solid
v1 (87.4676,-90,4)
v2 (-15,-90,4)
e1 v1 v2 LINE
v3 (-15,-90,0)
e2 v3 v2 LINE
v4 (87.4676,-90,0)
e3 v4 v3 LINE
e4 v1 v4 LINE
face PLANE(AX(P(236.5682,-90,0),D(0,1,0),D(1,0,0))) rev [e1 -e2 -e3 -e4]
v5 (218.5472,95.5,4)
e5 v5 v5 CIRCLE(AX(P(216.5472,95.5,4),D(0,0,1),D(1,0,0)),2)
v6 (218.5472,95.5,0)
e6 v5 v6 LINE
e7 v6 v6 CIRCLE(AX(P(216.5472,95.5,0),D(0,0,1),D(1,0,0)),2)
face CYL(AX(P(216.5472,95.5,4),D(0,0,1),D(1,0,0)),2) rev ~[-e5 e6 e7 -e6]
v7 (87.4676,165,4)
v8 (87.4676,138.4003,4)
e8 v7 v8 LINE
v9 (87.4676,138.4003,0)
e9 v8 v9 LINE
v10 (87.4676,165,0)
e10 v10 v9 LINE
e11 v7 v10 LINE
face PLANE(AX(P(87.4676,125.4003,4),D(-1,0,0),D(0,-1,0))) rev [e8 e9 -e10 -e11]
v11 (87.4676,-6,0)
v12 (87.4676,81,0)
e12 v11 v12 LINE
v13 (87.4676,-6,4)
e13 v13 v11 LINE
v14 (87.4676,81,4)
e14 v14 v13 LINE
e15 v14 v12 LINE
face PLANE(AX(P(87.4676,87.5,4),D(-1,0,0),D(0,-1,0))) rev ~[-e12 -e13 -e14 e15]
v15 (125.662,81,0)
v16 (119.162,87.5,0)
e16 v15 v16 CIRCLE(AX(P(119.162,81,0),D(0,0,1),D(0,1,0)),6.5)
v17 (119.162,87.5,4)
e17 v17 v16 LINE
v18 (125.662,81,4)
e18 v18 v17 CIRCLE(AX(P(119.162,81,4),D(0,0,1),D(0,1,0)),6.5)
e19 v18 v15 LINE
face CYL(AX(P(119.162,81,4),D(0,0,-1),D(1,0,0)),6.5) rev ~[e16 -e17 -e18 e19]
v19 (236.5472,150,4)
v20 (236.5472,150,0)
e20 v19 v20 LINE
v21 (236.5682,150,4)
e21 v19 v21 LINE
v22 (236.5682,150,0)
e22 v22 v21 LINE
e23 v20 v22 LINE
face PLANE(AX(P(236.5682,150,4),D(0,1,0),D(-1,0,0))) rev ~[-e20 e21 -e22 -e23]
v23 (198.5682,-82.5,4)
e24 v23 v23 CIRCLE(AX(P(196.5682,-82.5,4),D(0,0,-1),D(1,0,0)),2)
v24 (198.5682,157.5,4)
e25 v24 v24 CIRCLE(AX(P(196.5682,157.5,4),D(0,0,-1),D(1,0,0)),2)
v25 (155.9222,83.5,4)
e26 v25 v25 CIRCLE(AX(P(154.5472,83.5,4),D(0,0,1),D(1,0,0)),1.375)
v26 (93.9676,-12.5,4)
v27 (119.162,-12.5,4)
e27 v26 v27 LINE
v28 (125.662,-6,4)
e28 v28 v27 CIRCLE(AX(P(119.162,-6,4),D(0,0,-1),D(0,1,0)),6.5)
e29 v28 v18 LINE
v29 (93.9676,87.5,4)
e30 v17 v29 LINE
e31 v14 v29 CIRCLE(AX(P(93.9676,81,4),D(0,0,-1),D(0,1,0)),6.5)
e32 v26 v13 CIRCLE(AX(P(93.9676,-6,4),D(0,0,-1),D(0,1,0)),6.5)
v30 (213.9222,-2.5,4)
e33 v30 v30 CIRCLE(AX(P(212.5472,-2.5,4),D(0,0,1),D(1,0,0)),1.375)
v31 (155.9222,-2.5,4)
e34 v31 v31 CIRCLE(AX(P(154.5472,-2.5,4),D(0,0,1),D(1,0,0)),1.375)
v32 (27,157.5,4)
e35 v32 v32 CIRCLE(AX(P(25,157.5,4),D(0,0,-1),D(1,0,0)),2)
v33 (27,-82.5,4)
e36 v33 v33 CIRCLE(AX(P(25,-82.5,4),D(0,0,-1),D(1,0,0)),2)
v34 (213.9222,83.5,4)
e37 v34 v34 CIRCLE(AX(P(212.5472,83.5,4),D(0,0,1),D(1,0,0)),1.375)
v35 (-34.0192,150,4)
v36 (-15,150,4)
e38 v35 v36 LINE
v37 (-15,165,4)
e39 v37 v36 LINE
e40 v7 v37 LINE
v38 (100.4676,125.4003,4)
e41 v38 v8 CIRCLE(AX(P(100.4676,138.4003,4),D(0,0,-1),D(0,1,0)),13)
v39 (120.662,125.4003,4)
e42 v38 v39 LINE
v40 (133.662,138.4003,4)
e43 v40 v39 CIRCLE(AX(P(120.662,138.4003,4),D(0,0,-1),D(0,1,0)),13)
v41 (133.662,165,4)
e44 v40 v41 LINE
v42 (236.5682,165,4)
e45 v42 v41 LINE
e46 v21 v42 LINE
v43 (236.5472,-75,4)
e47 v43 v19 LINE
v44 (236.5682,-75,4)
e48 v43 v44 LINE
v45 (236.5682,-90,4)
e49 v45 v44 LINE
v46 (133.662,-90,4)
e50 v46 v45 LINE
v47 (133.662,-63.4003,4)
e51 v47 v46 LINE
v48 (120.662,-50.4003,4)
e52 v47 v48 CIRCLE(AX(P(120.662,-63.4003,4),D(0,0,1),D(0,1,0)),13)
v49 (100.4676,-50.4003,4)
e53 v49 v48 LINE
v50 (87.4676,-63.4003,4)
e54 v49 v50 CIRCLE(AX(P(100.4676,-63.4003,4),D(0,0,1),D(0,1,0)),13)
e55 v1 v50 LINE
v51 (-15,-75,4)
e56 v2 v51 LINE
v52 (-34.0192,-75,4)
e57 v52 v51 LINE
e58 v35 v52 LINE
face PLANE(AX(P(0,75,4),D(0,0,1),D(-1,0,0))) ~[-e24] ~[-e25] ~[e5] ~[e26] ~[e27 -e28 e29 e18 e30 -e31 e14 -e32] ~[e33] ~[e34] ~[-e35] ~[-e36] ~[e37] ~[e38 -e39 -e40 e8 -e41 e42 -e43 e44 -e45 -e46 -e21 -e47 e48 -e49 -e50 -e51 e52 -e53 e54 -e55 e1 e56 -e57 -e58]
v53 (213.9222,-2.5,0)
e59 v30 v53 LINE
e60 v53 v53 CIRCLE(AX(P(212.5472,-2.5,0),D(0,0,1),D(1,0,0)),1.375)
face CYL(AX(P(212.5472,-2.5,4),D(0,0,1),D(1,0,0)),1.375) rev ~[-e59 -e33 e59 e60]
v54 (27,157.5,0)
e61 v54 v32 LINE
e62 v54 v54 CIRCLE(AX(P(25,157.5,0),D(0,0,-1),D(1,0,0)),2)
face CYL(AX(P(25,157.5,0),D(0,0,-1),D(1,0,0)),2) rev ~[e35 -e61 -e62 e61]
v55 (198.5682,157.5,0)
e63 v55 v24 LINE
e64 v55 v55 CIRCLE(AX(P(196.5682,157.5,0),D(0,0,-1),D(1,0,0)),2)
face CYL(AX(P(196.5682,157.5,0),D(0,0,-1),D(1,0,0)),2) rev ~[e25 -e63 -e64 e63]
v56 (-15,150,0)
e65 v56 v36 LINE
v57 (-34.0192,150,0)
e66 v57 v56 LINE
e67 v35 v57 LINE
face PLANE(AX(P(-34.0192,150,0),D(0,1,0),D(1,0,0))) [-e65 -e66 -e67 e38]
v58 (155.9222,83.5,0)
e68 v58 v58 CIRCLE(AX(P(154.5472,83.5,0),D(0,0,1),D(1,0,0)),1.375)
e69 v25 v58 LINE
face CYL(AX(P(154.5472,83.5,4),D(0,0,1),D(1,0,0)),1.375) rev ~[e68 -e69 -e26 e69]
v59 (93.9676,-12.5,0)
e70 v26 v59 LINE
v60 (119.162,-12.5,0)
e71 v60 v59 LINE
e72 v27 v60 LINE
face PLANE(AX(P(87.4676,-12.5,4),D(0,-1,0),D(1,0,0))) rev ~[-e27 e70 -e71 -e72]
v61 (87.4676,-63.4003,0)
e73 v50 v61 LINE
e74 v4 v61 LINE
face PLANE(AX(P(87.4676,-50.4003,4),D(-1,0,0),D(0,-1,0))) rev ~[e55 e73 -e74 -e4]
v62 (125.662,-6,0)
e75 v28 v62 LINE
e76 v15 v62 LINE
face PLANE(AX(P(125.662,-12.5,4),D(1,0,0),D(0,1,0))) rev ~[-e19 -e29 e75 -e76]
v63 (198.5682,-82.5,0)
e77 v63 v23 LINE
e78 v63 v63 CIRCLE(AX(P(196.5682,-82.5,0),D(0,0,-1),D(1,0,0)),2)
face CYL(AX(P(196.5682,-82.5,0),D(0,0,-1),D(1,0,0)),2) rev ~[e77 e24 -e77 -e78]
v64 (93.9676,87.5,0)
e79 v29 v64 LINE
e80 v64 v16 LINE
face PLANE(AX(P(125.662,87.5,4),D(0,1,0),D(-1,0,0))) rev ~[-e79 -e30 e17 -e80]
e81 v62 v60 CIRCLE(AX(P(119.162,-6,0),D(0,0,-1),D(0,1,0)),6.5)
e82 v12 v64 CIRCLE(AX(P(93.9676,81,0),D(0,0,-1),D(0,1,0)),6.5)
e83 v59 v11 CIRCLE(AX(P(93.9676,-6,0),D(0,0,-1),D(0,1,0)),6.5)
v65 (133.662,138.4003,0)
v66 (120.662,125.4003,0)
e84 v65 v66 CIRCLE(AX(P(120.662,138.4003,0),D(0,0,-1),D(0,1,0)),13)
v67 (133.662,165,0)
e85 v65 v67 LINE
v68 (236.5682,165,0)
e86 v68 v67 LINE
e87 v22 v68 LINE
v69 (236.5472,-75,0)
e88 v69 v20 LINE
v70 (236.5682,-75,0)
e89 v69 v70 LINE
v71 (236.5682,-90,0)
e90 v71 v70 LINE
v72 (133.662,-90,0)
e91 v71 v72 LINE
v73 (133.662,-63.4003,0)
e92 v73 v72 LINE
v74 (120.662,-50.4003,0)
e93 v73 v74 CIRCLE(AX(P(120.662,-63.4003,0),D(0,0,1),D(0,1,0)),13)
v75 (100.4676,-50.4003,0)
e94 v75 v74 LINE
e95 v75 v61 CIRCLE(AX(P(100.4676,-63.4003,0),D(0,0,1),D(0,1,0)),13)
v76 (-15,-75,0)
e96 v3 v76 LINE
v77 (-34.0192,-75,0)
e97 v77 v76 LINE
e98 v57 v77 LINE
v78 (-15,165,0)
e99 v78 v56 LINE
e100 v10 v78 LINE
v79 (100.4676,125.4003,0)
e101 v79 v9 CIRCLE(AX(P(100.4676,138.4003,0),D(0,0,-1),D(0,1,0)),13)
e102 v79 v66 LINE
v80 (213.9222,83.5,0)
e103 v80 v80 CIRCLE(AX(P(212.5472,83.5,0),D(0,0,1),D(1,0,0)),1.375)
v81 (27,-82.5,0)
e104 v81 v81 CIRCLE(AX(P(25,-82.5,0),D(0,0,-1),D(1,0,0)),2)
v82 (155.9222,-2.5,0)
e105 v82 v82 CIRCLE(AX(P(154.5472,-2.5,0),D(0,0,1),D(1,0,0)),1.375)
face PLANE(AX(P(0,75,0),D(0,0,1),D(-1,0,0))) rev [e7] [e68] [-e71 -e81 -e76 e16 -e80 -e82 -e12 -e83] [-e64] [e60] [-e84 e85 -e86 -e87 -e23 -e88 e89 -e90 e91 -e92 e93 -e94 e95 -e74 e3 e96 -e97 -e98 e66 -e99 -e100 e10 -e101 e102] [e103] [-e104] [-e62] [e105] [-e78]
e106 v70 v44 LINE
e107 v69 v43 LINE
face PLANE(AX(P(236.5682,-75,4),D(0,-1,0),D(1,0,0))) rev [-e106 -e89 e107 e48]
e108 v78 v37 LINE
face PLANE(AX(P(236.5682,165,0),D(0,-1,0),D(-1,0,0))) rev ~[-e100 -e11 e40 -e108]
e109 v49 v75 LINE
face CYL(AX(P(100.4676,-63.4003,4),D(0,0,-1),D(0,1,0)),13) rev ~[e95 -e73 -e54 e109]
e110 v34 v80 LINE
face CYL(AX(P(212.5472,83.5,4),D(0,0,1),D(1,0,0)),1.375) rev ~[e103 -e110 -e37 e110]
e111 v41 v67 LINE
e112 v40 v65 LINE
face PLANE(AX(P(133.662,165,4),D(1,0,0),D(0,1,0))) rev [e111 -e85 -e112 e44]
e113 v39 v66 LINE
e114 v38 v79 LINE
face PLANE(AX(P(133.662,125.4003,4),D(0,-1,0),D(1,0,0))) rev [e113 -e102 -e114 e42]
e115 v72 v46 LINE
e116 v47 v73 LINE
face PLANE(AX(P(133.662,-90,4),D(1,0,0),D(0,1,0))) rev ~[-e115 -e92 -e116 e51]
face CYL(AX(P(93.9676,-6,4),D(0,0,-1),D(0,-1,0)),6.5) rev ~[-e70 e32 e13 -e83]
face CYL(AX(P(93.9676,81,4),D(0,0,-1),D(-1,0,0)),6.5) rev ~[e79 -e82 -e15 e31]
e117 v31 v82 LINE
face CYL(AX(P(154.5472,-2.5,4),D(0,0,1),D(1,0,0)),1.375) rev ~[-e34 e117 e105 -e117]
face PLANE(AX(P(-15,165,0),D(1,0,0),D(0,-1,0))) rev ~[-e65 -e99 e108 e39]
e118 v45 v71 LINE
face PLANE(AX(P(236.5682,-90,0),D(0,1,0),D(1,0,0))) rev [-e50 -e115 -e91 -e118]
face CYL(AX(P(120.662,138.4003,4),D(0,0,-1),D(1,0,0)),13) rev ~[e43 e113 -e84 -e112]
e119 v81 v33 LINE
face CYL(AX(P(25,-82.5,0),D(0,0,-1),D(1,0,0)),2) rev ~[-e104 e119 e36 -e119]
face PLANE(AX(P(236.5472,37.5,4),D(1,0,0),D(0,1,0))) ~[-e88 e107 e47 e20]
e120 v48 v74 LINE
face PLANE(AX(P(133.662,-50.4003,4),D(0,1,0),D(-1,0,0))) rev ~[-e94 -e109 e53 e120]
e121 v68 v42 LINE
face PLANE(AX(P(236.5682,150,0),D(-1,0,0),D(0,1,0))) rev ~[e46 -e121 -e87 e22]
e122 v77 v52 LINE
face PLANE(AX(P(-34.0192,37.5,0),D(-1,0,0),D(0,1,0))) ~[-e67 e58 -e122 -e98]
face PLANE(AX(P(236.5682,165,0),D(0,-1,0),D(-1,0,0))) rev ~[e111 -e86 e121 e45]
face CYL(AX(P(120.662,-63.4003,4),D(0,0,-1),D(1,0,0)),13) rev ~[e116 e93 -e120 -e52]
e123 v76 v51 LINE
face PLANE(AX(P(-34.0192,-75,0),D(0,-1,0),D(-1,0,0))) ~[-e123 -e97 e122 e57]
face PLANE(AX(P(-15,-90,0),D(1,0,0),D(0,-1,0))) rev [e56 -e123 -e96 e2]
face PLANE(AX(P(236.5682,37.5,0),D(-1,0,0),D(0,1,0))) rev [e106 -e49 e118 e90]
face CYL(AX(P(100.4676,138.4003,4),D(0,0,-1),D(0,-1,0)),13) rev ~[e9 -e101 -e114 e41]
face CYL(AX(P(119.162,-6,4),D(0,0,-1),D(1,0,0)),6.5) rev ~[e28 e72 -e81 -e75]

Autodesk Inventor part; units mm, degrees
ref_plane "YZ Plane" through (0, 0, 0) normal (1, 0, 0) x (0, 1, 0)
ref_plane "XZ Plane" through (0, 0, 0) normal (0, 1, 0) x (-1, 0, 0)
sketch "Эскиз1" plane through (0, 0, 0) normal (0, 0, 1) x (1, 0, 0)
  circle A0 centre (25, 157.5) radius 2
  circle A1 centre (196.5682, 157.5) radius 2
  line L0 (236.5682, 150) -> (236.5682, 165) projected
  line L1 (-34.0192, 150) -> (-15, 150)
  line L2 (-34.0192, 150) -> (-15, 150)
  line L3 (-34.0192, 37.5) -> (-34.0192, 150)
  line L4 (236.5682, 165) -> (-15, 165)
  line L5 (236.5682, 37.5) -> (236.5682, 165)
  line L6 (-34.0192, 37.5) -> (236.5682, 37.5)
  line L7 (-15, 165) -> (-15, 150)
  dimension "d5" = 127.5
  dimension "d6" = 7.5
  dimension "d7" = 7.5
  dimension "d9" = 15
extrude "Выдавливание1" add sketch "Эскиз1" along normal blind 4
sketch "Эскиз2" plane through (0, 0, 4) normal (0, 0, 1) x (1, 0, 0)
  line L0 (236.5682, 150) -> (199.2972, 150)
  line L1 (-15, 150) -> (-34.0192, 150) projected
  line L2 (-34.0192, 37.5) -> (236.5682, 37.5) projected
  line L3 (199.2972, 150) -> (236.5682, 150)
  line L4 (236.5682, 150) -> (236.5682, 37.5)
  line L5 (236.5682, 37.5) -> (199.2972, 37.5)
  line L6 (199.2972, 37.5) -> (199.2972, 150)
  point P0 (0, 0)
  point P1 (-24.5096, 150)
  point P2 (-15, -15)
extrude "Выдавливание2" cut sketch "Эскиз2" against normal blind 4
mirror "Зеркальное отражение2" about plane through (-34.0192, 37.5, 0) normal (0, -1, 0) of "Выдавливание1", "Выдавливание2"
sketch "Эскиз3" plane through (0, 0, 4) normal (0, 0, 1) x (1, 0, 0)
  line L0 (236.5682, -90) -> (-15, -90) projected
  line L1 (87.4676, -90) -> (133.662, -90)
  line L2 (133.662, -90) -> (133.662, -50.4003)
  line L3 (133.662, -50.4003) -> (87.4676, -50.4003)
  line L4 (87.4676, -50.4003) -> (87.4676, -90)
  point P0 (0, 0)
extrude "Выдавливание3" cut sketch "Эскиз3" against normal blind 10
ref_plane "РабПлоскость1" through (199.2972, 37.5, 4) normal (0, 1, 0) x (1, 0, 0)
mirror "Зеркальное отражение3" about plane through (199.2972, 37.5, 4) normal (0, 1, 0) of "Выдавливание3"
move faces "Перенос1" translate (37.25, 0, 0) faces at (199.2972, 0, 2.6667)
sketch "Эскиз4" plane through (0, 0, 4) normal (0, 0, 1) x (1, 0, 0)
  circle A0 centre (154.5472, 83.5) radius 1.375 projected
  circle A1 centre (154.5472, -2.5) radius 1.375 projected
  circle A2 centre (212.5472, -2.5) radius 1.375 projected
  circle A3 centre (212.5472, 83.5) radius 1.375 projected
  circle A4 centre (216.5472, 95.5) radius 2 projected
  circle A5 centre (216.5472, -20.5) radius 2 projected
  line L0 (215.9472, 87.5) -> (138.1472, 87.5) projected
  line L1 (138.1472, -12.5) -> (215.9472, -12.5) projected
  line L2 (125.662, 87.5) -> (87.4676, 87.5)
  line L3 (87.4676, 87.5) -> (87.4676, -12.5)
  line L4 (87.4676, -12.5) -> (125.662, -12.5)
  line L5 (125.662, -12.5) -> (125.662, 87.5)
  line L6 (87.4676, -90) -> (87.4676, -50.4003) projected
  line L7 (133.662, -50.4003) -> (133.662, -90) projected
  point P0 (0, 0)
  dimension "d15" = 8
extrude "Выдавливание4" cut sketch "Эскиз4" against normal blind 10 contours A0 | A1 | A2 | A3 | A4 | L5 L4 L3 L2
fillet "Сопряжение1" radius 13 4 edges at (87.4676, 125.4003, 2) (133.662, 125.4003, 2) (87.4676, -50.4003, 2) (133.662, -50.4003, 2)
fillet "Сопряжение2" radius 6.5 4 edges at (87.4676, -12.5, 2) (125.662, -12.5, 2) (87.4676, 87.5, 2) (125.662, 87.5, 2)
properties part number "KB33-046-004-018 - Полка электроники"
